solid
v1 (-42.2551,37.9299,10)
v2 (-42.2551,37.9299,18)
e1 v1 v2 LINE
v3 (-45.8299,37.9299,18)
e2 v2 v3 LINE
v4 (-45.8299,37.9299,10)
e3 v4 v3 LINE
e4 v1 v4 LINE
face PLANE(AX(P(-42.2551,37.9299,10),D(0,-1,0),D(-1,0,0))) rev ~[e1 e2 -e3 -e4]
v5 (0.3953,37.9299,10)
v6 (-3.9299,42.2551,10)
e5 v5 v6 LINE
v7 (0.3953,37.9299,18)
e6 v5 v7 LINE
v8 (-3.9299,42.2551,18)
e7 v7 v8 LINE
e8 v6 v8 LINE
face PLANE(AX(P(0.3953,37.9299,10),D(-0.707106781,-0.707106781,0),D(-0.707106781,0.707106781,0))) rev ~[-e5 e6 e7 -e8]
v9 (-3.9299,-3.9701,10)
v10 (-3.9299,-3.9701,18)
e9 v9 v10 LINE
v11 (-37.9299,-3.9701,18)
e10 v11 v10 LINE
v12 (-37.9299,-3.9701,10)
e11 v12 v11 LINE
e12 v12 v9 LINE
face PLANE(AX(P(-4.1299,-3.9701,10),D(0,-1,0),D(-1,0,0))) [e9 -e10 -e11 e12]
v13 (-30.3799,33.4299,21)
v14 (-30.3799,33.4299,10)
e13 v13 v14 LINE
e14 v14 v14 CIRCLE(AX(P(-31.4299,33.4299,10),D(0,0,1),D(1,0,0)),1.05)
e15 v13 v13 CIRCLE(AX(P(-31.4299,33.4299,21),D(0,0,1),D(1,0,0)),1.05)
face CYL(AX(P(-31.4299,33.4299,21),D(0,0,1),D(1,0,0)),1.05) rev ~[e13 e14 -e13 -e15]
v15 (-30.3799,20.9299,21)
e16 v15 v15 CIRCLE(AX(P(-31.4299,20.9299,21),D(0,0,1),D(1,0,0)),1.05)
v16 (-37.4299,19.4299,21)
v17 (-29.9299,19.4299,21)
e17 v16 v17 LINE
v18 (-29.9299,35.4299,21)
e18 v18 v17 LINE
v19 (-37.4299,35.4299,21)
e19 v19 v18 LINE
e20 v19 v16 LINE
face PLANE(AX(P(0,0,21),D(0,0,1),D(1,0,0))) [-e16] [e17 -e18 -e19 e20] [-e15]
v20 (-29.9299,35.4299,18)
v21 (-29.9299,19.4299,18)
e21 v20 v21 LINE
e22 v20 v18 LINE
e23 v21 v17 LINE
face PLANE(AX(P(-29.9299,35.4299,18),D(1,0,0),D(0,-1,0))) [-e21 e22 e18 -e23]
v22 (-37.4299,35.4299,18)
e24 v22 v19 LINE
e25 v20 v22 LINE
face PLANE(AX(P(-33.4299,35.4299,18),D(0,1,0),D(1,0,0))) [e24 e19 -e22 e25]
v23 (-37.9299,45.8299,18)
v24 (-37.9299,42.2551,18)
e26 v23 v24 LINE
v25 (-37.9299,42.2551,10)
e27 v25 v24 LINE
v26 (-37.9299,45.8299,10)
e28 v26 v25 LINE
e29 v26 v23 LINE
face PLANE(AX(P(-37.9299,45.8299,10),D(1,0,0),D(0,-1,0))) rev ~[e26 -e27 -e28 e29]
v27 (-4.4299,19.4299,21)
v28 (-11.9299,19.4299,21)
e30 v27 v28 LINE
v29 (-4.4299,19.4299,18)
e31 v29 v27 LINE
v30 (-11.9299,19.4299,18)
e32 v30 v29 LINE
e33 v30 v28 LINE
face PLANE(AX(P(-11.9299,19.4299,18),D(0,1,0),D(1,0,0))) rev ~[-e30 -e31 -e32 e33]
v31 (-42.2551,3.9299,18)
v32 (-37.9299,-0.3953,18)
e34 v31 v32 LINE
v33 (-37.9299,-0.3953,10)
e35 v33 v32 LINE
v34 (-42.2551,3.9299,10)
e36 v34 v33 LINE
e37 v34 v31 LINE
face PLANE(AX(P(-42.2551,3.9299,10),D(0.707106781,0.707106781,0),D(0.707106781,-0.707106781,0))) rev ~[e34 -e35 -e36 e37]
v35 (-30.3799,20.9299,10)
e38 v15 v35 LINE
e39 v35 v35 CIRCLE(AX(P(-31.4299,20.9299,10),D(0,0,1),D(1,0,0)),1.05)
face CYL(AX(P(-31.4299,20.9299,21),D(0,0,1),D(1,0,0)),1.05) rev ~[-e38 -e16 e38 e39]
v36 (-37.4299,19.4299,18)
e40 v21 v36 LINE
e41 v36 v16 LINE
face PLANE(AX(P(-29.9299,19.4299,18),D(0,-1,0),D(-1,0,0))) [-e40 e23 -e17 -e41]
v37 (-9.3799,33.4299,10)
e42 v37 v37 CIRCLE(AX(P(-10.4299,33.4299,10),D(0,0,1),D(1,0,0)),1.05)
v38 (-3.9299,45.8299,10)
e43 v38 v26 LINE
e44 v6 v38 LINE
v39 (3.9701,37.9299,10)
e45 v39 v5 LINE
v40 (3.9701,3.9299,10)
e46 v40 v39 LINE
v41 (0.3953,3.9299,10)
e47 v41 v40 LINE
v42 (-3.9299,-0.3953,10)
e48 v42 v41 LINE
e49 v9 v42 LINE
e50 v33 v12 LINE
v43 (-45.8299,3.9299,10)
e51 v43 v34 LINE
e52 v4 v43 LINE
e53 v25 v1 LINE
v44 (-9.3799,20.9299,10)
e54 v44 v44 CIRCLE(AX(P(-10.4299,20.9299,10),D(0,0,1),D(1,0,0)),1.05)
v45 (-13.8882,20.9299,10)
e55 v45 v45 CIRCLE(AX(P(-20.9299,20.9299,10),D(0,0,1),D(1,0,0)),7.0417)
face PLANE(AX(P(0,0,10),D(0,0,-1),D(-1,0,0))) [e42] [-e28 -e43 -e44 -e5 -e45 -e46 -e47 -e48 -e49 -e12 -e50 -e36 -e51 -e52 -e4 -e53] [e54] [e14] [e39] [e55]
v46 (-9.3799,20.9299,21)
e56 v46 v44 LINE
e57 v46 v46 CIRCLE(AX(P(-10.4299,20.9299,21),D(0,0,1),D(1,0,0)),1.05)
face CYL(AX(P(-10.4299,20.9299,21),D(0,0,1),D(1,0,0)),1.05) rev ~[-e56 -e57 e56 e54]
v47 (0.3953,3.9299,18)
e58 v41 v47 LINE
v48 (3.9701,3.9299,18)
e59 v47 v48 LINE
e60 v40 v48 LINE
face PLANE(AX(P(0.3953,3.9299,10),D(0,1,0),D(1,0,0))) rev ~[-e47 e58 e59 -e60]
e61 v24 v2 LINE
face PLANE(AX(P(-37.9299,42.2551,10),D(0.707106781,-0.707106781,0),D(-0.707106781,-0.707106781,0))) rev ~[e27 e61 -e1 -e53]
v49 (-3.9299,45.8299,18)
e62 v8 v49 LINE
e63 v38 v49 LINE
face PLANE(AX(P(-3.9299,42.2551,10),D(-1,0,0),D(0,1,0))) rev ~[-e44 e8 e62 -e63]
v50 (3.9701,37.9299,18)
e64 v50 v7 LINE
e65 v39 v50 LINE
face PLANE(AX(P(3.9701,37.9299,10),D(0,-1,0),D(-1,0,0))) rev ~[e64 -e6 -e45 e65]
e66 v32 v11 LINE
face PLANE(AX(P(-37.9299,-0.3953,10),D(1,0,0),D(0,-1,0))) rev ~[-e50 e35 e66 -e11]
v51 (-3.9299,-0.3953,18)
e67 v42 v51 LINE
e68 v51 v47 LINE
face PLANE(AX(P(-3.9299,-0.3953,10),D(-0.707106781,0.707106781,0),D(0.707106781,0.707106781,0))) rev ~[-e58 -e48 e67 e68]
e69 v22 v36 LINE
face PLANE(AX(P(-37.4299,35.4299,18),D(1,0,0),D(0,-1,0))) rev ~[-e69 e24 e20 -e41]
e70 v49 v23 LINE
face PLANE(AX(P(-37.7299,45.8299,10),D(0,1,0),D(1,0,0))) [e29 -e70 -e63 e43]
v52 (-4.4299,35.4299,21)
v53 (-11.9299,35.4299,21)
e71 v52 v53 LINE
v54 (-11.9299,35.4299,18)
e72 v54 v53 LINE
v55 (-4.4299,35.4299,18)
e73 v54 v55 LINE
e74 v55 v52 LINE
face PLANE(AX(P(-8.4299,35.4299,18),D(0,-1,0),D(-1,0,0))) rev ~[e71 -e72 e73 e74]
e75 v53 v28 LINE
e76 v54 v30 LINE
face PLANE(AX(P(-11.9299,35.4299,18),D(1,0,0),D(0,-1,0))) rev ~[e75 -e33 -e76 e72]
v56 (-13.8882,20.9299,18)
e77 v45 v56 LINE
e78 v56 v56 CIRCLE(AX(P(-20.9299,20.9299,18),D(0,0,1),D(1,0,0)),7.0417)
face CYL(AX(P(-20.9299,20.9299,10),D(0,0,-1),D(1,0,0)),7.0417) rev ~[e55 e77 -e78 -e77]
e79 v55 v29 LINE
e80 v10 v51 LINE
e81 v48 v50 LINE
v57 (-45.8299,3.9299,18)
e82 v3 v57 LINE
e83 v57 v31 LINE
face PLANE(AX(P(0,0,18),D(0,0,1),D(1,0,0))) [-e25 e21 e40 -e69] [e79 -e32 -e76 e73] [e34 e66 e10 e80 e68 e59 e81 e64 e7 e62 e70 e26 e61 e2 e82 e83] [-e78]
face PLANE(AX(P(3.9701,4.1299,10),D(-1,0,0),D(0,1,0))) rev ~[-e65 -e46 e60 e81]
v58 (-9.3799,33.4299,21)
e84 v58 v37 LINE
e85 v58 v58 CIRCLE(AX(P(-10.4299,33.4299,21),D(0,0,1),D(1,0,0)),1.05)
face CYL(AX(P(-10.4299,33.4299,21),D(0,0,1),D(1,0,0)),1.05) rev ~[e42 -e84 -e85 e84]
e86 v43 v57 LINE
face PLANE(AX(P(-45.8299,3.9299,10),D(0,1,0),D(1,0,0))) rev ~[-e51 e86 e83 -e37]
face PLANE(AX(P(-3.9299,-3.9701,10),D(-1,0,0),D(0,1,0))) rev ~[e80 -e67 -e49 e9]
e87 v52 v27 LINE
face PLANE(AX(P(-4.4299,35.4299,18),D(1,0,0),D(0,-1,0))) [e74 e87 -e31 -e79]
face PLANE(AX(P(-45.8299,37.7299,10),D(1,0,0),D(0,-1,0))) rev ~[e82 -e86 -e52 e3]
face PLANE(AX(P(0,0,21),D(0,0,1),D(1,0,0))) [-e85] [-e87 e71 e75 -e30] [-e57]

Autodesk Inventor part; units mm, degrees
ref_plane "YZ Plane" through (0, 0, 0) normal (1, 0, 0) x (0, 1, 0)
ref_plane "Work Plane1" through (0, 0, 10) normal (0, 0, 1) x (1, 0, 0)
sketch "Sketch1" plane through (0, 0, 10) normal (0, 0, 1) x (1, 0, 0)
  line L0 (-4.0299, -0.3538) -> (-2.2322, 1.4439) construction
  arc A0 (-1.4439, 2.2322) -> (-2.2322, 1.4439) centre (-0.9299, 0.9299) ccw construction
  line L1 (-1.4439, 2.2322) -> (0.3538, 4.0299) construction
  line L2 (-37.8299, 42.2137) -> (-37.8299, 45.8299) construction
  line L3 (-37.8299, 45.8299) -> (-4.0299, 45.8299) construction
  line L4 (-4.0299, 45.8299) -> (-4.0299, 42.2137) construction
  line L5 (-4.0299, 4.0299) -> (0.3538, 4.0299) projected
  circle A1 centre (-20.9299, 20.9299) radius 17.5 projected
  line L6 (-20.9299, 58.9723) -> (17.1124, 20.9299) construction
  line L7 (17.1124, 20.9299) -> (-20.9299, -17.1124) construction
  line L8 (-20.9299, -17.1124) -> (-58.9723, 20.9299) construction
  line L9 (-58.9723, 20.9299) -> (-20.9299, 58.9723) construction
  line L10 (-20.9299, 58.9723) -> (-20.9299, -17.1124) construction
  line L11 (17.1124, 20.9299) -> (-58.9723, 20.9299) construction
  line L12 (-20.9299, 58.9723) -> (32.8701, 58.9723) construction
  line L13 (-43.4299, 43.4299) -> (1.5701, 43.4299) construction
  line L14 (1.5701, 43.4299) -> (1.5701, -1.5701) construction
  line L15 (1.5701, -1.5701) -> (-43.4299, -1.5701) construction
  line L16 (-43.4299, -1.5701) -> (-43.4299, 43.4299) construction
  line L17 (-43.4299, 43.4299) -> (1.5701, -1.5701) construction
  line L18 (1.5701, 43.4299) -> (-43.4299, -1.5701) construction
  line L19 (-43.4299, 5.3876) -> (-43.4299, 36.4723)
  line L20 (-43.4299, 36.4723) -> (-36.4723, 43.4299)
  line L21 (-36.4723, 43.4299) -> (-5.3876, 43.4299)
  line L22 (-5.3876, 43.4299) -> (1.5701, 36.4723)
  line L23 (1.5701, 36.4723) -> (1.5701, 5.3876)
  line L24 (1.5701, 5.3876) -> (-5.3876, -1.5701)
  line L25 (-5.3876, -1.5701) -> (-36.4723, -1.5701)
  line L26 (-36.4723, -1.5701) -> (-43.4299, 5.3876)
  line L27 (-4.0299, 42.2137) -> (-37.8299, 42.2137) projected
  line L28 (-4.0299, -0.3538) -> (-4.0299, 4.0299) projected
  circle A2 centre (-20.9299, 20.9299) radius 7.0417
  point P0 (-37.8299, 4.0299)
  dimension "d18" = 53.8
  dimension "d19" = 45
  dimension "d20" = 53.8
  dimension "d21" = 45
  dimension "d22" = 45
extrude "Extrusion1" add sketch "Sketch1" along normal blind 8 contours L28 L24 L25 L26 L19 L20 L27 L22 L23 L5 | L5 L24 L28 | L27 L20 L21 L22 | A1
sketch "Sketch3" plane through (0, 0, 10) normal (0, 0, -1) x (-1, 0, 0)
  line L0 (37.8299, -0.4701) -> (37.8299, 4.0299) construction
  line L1 (4.0299, 4.0299) -> (4.0299, -0.4701) construction
  line L2 (37.8299, -0.4701) -> (37.8299, 1.1886) construction
  line L3 (4.0299, -3.9701) -> (4.0299, -0.3538) construction
  line L4 (45.8299, 4.0299) -> (42.2137, 4.0299) construction
  line L5 (-0.3538, 4.0299) -> (-3.9701, 4.0299) construction
  line L6 (-3.9701, 37.8299) -> (-0.3538, 37.8299) construction
  line L7 (4.0299, 42.2137) -> (4.0299, 45.8299) construction
  line L8 (37.8299, 45.8299) -> (37.8299, 42.2137) construction
  line L9 (42.2137, 37.8299) -> (45.8299, 37.8299) construction
  line L10 (37.8299, 37.7299) -> (45.8299, 37.7299)
  line L11 (45.8299, 37.7299) -> (45.8299, 4.1299)
  line L12 (45.8299, 4.1299) -> (37.8299, 4.1299)
  line L13 (37.8299, 4.1299) -> (37.8299, 37.7299)
  line L14 (37.7299, 4.0299) -> (4.1299, 4.0299)
  line L15 (4.1299, 4.0299) -> (4.1299, -3.9701)
  line L16 (4.1299, -3.9701) -> (37.7299, -3.9701)
  line L17 (37.7299, -3.9701) -> (37.7299, 4.0299)
  line L18 (4.0299, 4.1299) -> (-3.9701, 4.1299)
  line L19 (-3.9701, 4.1299) -> (-3.9701, 37.7299)
  line L20 (-3.9701, 37.7299) -> (4.0299, 37.7299)
  line L21 (4.0299, 37.7299) -> (4.0299, 4.1299)
  line L22 (4.1299, 37.8299) -> (37.7299, 37.8299)
  line L23 (37.7299, 37.8299) -> (37.7299, 45.8299)
  line L24 (37.7299, 45.8299) -> (4.1299, 45.8299)
  line L25 (4.1299, 45.8299) -> (4.1299, 37.8299)
  point P0 (0, 0)
  dimension "d23" = 0.1
  dimension "d24" = 0.1
  dimension "d25" = 0.1
  dimension "d26" = 0.1
  dimension "d27" = 0.1
extrude "Extrusion3" add sketch "Sketch3" against normal up to surface (8 mm away)
sketch "Sketch4" plane through (0, 0, 18) normal (0, 0, 1) x (1, 0, 0)
  line L0 (-33.4299, 35.4299) -> (-33.4299, 11.4299) construction
  line L1 (-33.4299, 11.4299) -> (-8.4299, 11.4299) construction
  line L2 (-8.4299, 11.4299) -> (-8.4299, 35.4299) construction
  line L3 (-8.4299, 35.4299) -> (-33.4299, 35.4299) construction
  circle A0 centre (-10.4299, 33.4299) radius 1.05 construction
  circle A1 centre (-10.4299, 20.9299) radius 1.05 construction
  circle A2 centre (-31.4299, 20.9299) radius 1.05 construction
  circle A3 centre (-31.4299, 33.4299) radius 1.05 construction
  line L4 (-15.4299, 29.8299) -> (-12.4299, 29.8299) construction
  line L5 (-15.4299, 31.8299) -> (-15.4299, 29.8299) construction
  line L6 (-12.4299, 31.8299) -> (-15.4299, 31.8299) construction
  line L7 (-12.4299, 29.8299) -> (-12.4299, 31.8299) construction
  line L8 (-8.4299, 35.4299) -> (-11.9299, 35.4299)
  line L9 (-11.9299, 35.4299) -> (-11.9299, 19.4299)
  line L10 (-11.9299, 19.4299) -> (-8.4299, 19.4299)
  line L11 (-8.4299, 19.4299) -> (-8.4299, 35.4299)
  line L12 (-33.4299, 35.4299) -> (-29.9299, 35.4299)
  line L13 (-29.9299, 35.4299) -> (-29.9299, 19.4299)
  line L14 (-29.9299, 19.4299) -> (-33.4299, 19.4299)
  line L15 (-33.4299, 19.4299) -> (-33.4299, 35.4299)
  line L16 (-33.4299, 35.4299) -> (-37.4299, 35.4299)
  line L17 (-37.4299, 35.4299) -> (-37.4299, 19.4299)
  line L18 (-37.4299, 19.4299) -> (-33.4299, 19.4299)
  line L19 (-33.4299, 19.4299) -> (-33.4299, 35.4299)
  line L20 (-8.4299, 35.4299) -> (-4.4299, 35.4299)
  line L21 (-4.4299, 35.4299) -> (-4.4299, 19.4299)
  line L22 (-4.4299, 19.4299) -> (-8.4299, 19.4299)
  line L23 (-8.4299, 19.4299) -> (-8.4299, 35.4299)
  point P0 (0, 0)
  dimension "d30" = 3.5
  dimension "d31" = 16
  dimension "d32" = 3.5
  dimension "d37" = 4
  dimension "d38" = 4
ref_plane "Work Plane3" through (-33.4299, 11.4299, 16.4) normal (0, 0, -1) x (0, 1, 0)
extrude "Extrusion4" add sketch "Sketch4" along normal blind 3
sketch "Sketch5" plane through (-11.9299, 35.4299, 21) normal (0, 0, 1) x (1, 0, 0)
  circle A0 centre (1.5, -14.5) radius 1.05 projected
  circle A1 centre (1.5, -2) radius 1.05 projected
  circle A2 centre (-19.5, -2) radius 1.05 projected
  circle A3 centre (-19.5, -14.5) radius 1.05 projected
  point P0 (11.9299, -35.4299)
extrude "Extrusion5" cut sketch "Sketch5" against normal through all
sketch "Skizze12" plane through (0, 0, 10) normal (0, 0, -1) x (-1, 0, 0)
  line L0 (-0.3124, 4.1299) -> (4.1299, -0.3124) projected
  line L1 (4.1299, -0.3124) -> (4.1299, -3.9701) projected
  line L2 (4.1299, -3.9701) -> (37.7299, -3.9701) construction
  line L3 (37.7299, -3.9701) -> (37.7299, -0.3124) projected
  line L4 (37.7299, -0.3124) -> (42.1723, 4.1299) projected
  line L5 (45.8299, 4.1299) -> (42.1723, 4.1299) projected
  line L6 (45.8299, 37.7299) -> (45.8299, 4.1299) construction
  line L7 (42.1723, 37.7299) -> (45.8299, 37.7299) projected
  line L8 (42.1723, 37.7299) -> (37.7299, 42.1723) projected
  line L9 (37.7299, 42.1723) -> (37.7299, 45.8299) projected
  line L10 (37.7299, 45.8299) -> (4.1299, 45.8299) construction
  line L11 (4.1299, 45.8299) -> (4.1299, 42.1723) projected
  line L12 (4.1299, 42.1723) -> (-0.3124, 37.7299) projected
  line L13 (-3.9701, 37.7299) -> (-0.3124, 37.7299) projected
  line L14 (-3.9701, 4.1299) -> (-3.9701, 37.7299) construction
  line L15 (-0.3124, 4.1299) -> (-3.9701, 4.1299) projected
  circle A0 centre (20.9299, 20.9299) radius 7.0417 construction
  line L16 (37.9299, -4.1701) -> (3.9299, -4.1701) construction
  line L17 (3.9299, -4.1701) -> (3.9299, -0.3953)
  line L18 (3.9299, -0.3953) -> (-0.3953, 3.9299)
  line L19 (-0.3953, 3.9299) -> (-4.1701, 3.9299)
  line L20 (-4.1701, 3.9299) -> (-4.1701, 37.9299) construction
  line L21 (-4.1701, 37.9299) -> (-0.3953, 37.9299)
  line L22 (-0.3953, 37.9299) -> (3.9299, 42.2551)
  line L23 (3.9299, 42.2551) -> (3.9299, 46.0299)
  line L24 (3.9299, 46.0299) -> (37.9299, 46.0299) construction
  line L25 (37.9299, 46.0299) -> (37.9299, 42.2551)
  line L26 (37.9299, 42.2551) -> (42.2551, 37.9299)
  line L27 (42.2551, 37.9299) -> (46.0299, 37.9299)
  line L28 (46.0299, 37.9299) -> (46.0299, 3.9299) construction
  line L29 (46.0299, 3.9299) -> (42.2551, 3.9299)
  line L30 (42.2551, 3.9299) -> (37.9299, -0.3953)
  line L31 (37.9299, -0.3953) -> (37.9299, -4.1701)
  line L32 (-3.9701, 37.7299) -> (-3.9701, 37.9299)
  line L33 (37.7299, 45.8299) -> (4.1299, 45.8299) projected
  line L34 (4.1299, 45.8299) -> (3.9299, 45.8299)
  line L35 (37.7299, 45.8299) -> (37.9299, 45.8299)
  line L36 (45.8299, 37.7299) -> (45.8299, 37.9299)
  line L37 (45.8299, 4.1299) -> (45.8299, 3.9299)
  line L38 (37.7299, -3.9701) -> (37.9299, -3.9701)
  line L39 (4.1299, -3.9701) -> (3.9299, -3.9701)
  line L40 (-3.9701, 4.1299) -> (-3.9701, 3.9299)
  point P0 (0, 0)
  dimension "d65" = 0.2
extrude "IM_offset" add sketch "Skizze12" against normal up to surface (8 mm away)
sketch "Sketch13" plane through (0, 0, 18) normal (0, 0, 1) x (1, 0, 0)
  line L0 (3.9701, 37.9299) -> (3.9701, 3.9299) projected
  line L1 (0.3953, 37.9299) -> (3.9701, 37.9299) projected
  line L2 (-3.9299, 42.2551) -> (0.3953, 37.9299) projected
  line L3 (-3.9299, 45.8299) -> (-3.9299, 42.2551) projected
  line L4 (-37.9299, 45.8299) -> (-3.9299, 45.8299) projected
  line L5 (-37.9299, 42.2551) -> (-37.9299, 45.8299) projected
  line L6 (-42.2551, 37.9299) -> (-37.9299, 42.2551) projected
  line L7 (-45.8299, 37.9299) -> (-42.2551, 37.9299) projected
  line L8 (-45.8299, 3.9299) -> (-45.8299, 37.9299) projected
  line L9 (-42.2551, 3.9299) -> (-45.8299, 3.9299) projected
  line L10 (-37.9299, -0.3953) -> (-42.2551, 3.9299) projected
  line L11 (-37.9299, -3.9701) -> (-37.9299, -0.3953) projected
  line L12 (-3.9299, -3.9701) -> (-37.9299, -3.9701) projected
  line L13 (-3.9299, -0.3953) -> (-3.9299, -3.9701) projected
  line L14 (0.3953, 3.9299) -> (-3.9299, -0.3953) projected
  line L15 (3.9701, 3.9299) -> (0.3953, 3.9299) projected
  circle A0 centre (-20.9299, 20.9299) radius 7.0417 projected
  line L16 (-33.2963, 30.7242) -> (-29.9299, 30.7242) projected
  line L17 (-29.9299, 30.7242) -> (-29.9299, 35.4299) projected
  line L18 (-29.9299, 35.4299) -> (-37.4299, 35.4299) projected
  line L19 (-37.4299, 35.4299) -> (-37.4299, 19.4299) projected
  line L20 (-37.4299, 19.4299) -> (-29.9299, 19.4299) projected
  line L21 (-29.9299, 19.4299) -> (-29.9299, 22.7242) projected
  line L22 (-29.9299, 22.7242) -> (-33.2963, 22.7242) projected
  line L23 (-33.2963, 22.7242) -> (-33.2963, 30.7242) projected
  circle A1 centre (-31.4299, 33.4299) radius 1.05 projected
  circle A2 centre (-31.4299, 20.9299) radius 1.05 projected
  line L24 (-8.2963, 22.7242) -> (-11.9299, 22.7242) projected
  line L25 (-11.9299, 22.7242) -> (-11.9299, 19.4299) projected
  line L26 (-11.9299, 19.4299) -> (-4.4299, 19.4299) projected
  line L27 (-4.4299, 19.4299) -> (-4.4299, 35.4299) projected
  line L28 (-4.4299, 35.4299) -> (-11.9299, 35.4299) projected
  line L29 (-11.9299, 35.4299) -> (-11.9299, 30.7242) projected
  line L30 (-11.9299, 30.7242) -> (-8.2963, 30.7242) projected
  line L31 (-8.2963, 30.7242) -> (-8.2963, 22.7242) projected
  circle A3 centre (-10.4299, 20.9299) radius 1.05 projected
  circle A4 centre (-10.4299, 33.4299) radius 1.05 projected
  point P0 (0, 0)
properties part number "20_Cube_Insert_RaspiCam_v3"
